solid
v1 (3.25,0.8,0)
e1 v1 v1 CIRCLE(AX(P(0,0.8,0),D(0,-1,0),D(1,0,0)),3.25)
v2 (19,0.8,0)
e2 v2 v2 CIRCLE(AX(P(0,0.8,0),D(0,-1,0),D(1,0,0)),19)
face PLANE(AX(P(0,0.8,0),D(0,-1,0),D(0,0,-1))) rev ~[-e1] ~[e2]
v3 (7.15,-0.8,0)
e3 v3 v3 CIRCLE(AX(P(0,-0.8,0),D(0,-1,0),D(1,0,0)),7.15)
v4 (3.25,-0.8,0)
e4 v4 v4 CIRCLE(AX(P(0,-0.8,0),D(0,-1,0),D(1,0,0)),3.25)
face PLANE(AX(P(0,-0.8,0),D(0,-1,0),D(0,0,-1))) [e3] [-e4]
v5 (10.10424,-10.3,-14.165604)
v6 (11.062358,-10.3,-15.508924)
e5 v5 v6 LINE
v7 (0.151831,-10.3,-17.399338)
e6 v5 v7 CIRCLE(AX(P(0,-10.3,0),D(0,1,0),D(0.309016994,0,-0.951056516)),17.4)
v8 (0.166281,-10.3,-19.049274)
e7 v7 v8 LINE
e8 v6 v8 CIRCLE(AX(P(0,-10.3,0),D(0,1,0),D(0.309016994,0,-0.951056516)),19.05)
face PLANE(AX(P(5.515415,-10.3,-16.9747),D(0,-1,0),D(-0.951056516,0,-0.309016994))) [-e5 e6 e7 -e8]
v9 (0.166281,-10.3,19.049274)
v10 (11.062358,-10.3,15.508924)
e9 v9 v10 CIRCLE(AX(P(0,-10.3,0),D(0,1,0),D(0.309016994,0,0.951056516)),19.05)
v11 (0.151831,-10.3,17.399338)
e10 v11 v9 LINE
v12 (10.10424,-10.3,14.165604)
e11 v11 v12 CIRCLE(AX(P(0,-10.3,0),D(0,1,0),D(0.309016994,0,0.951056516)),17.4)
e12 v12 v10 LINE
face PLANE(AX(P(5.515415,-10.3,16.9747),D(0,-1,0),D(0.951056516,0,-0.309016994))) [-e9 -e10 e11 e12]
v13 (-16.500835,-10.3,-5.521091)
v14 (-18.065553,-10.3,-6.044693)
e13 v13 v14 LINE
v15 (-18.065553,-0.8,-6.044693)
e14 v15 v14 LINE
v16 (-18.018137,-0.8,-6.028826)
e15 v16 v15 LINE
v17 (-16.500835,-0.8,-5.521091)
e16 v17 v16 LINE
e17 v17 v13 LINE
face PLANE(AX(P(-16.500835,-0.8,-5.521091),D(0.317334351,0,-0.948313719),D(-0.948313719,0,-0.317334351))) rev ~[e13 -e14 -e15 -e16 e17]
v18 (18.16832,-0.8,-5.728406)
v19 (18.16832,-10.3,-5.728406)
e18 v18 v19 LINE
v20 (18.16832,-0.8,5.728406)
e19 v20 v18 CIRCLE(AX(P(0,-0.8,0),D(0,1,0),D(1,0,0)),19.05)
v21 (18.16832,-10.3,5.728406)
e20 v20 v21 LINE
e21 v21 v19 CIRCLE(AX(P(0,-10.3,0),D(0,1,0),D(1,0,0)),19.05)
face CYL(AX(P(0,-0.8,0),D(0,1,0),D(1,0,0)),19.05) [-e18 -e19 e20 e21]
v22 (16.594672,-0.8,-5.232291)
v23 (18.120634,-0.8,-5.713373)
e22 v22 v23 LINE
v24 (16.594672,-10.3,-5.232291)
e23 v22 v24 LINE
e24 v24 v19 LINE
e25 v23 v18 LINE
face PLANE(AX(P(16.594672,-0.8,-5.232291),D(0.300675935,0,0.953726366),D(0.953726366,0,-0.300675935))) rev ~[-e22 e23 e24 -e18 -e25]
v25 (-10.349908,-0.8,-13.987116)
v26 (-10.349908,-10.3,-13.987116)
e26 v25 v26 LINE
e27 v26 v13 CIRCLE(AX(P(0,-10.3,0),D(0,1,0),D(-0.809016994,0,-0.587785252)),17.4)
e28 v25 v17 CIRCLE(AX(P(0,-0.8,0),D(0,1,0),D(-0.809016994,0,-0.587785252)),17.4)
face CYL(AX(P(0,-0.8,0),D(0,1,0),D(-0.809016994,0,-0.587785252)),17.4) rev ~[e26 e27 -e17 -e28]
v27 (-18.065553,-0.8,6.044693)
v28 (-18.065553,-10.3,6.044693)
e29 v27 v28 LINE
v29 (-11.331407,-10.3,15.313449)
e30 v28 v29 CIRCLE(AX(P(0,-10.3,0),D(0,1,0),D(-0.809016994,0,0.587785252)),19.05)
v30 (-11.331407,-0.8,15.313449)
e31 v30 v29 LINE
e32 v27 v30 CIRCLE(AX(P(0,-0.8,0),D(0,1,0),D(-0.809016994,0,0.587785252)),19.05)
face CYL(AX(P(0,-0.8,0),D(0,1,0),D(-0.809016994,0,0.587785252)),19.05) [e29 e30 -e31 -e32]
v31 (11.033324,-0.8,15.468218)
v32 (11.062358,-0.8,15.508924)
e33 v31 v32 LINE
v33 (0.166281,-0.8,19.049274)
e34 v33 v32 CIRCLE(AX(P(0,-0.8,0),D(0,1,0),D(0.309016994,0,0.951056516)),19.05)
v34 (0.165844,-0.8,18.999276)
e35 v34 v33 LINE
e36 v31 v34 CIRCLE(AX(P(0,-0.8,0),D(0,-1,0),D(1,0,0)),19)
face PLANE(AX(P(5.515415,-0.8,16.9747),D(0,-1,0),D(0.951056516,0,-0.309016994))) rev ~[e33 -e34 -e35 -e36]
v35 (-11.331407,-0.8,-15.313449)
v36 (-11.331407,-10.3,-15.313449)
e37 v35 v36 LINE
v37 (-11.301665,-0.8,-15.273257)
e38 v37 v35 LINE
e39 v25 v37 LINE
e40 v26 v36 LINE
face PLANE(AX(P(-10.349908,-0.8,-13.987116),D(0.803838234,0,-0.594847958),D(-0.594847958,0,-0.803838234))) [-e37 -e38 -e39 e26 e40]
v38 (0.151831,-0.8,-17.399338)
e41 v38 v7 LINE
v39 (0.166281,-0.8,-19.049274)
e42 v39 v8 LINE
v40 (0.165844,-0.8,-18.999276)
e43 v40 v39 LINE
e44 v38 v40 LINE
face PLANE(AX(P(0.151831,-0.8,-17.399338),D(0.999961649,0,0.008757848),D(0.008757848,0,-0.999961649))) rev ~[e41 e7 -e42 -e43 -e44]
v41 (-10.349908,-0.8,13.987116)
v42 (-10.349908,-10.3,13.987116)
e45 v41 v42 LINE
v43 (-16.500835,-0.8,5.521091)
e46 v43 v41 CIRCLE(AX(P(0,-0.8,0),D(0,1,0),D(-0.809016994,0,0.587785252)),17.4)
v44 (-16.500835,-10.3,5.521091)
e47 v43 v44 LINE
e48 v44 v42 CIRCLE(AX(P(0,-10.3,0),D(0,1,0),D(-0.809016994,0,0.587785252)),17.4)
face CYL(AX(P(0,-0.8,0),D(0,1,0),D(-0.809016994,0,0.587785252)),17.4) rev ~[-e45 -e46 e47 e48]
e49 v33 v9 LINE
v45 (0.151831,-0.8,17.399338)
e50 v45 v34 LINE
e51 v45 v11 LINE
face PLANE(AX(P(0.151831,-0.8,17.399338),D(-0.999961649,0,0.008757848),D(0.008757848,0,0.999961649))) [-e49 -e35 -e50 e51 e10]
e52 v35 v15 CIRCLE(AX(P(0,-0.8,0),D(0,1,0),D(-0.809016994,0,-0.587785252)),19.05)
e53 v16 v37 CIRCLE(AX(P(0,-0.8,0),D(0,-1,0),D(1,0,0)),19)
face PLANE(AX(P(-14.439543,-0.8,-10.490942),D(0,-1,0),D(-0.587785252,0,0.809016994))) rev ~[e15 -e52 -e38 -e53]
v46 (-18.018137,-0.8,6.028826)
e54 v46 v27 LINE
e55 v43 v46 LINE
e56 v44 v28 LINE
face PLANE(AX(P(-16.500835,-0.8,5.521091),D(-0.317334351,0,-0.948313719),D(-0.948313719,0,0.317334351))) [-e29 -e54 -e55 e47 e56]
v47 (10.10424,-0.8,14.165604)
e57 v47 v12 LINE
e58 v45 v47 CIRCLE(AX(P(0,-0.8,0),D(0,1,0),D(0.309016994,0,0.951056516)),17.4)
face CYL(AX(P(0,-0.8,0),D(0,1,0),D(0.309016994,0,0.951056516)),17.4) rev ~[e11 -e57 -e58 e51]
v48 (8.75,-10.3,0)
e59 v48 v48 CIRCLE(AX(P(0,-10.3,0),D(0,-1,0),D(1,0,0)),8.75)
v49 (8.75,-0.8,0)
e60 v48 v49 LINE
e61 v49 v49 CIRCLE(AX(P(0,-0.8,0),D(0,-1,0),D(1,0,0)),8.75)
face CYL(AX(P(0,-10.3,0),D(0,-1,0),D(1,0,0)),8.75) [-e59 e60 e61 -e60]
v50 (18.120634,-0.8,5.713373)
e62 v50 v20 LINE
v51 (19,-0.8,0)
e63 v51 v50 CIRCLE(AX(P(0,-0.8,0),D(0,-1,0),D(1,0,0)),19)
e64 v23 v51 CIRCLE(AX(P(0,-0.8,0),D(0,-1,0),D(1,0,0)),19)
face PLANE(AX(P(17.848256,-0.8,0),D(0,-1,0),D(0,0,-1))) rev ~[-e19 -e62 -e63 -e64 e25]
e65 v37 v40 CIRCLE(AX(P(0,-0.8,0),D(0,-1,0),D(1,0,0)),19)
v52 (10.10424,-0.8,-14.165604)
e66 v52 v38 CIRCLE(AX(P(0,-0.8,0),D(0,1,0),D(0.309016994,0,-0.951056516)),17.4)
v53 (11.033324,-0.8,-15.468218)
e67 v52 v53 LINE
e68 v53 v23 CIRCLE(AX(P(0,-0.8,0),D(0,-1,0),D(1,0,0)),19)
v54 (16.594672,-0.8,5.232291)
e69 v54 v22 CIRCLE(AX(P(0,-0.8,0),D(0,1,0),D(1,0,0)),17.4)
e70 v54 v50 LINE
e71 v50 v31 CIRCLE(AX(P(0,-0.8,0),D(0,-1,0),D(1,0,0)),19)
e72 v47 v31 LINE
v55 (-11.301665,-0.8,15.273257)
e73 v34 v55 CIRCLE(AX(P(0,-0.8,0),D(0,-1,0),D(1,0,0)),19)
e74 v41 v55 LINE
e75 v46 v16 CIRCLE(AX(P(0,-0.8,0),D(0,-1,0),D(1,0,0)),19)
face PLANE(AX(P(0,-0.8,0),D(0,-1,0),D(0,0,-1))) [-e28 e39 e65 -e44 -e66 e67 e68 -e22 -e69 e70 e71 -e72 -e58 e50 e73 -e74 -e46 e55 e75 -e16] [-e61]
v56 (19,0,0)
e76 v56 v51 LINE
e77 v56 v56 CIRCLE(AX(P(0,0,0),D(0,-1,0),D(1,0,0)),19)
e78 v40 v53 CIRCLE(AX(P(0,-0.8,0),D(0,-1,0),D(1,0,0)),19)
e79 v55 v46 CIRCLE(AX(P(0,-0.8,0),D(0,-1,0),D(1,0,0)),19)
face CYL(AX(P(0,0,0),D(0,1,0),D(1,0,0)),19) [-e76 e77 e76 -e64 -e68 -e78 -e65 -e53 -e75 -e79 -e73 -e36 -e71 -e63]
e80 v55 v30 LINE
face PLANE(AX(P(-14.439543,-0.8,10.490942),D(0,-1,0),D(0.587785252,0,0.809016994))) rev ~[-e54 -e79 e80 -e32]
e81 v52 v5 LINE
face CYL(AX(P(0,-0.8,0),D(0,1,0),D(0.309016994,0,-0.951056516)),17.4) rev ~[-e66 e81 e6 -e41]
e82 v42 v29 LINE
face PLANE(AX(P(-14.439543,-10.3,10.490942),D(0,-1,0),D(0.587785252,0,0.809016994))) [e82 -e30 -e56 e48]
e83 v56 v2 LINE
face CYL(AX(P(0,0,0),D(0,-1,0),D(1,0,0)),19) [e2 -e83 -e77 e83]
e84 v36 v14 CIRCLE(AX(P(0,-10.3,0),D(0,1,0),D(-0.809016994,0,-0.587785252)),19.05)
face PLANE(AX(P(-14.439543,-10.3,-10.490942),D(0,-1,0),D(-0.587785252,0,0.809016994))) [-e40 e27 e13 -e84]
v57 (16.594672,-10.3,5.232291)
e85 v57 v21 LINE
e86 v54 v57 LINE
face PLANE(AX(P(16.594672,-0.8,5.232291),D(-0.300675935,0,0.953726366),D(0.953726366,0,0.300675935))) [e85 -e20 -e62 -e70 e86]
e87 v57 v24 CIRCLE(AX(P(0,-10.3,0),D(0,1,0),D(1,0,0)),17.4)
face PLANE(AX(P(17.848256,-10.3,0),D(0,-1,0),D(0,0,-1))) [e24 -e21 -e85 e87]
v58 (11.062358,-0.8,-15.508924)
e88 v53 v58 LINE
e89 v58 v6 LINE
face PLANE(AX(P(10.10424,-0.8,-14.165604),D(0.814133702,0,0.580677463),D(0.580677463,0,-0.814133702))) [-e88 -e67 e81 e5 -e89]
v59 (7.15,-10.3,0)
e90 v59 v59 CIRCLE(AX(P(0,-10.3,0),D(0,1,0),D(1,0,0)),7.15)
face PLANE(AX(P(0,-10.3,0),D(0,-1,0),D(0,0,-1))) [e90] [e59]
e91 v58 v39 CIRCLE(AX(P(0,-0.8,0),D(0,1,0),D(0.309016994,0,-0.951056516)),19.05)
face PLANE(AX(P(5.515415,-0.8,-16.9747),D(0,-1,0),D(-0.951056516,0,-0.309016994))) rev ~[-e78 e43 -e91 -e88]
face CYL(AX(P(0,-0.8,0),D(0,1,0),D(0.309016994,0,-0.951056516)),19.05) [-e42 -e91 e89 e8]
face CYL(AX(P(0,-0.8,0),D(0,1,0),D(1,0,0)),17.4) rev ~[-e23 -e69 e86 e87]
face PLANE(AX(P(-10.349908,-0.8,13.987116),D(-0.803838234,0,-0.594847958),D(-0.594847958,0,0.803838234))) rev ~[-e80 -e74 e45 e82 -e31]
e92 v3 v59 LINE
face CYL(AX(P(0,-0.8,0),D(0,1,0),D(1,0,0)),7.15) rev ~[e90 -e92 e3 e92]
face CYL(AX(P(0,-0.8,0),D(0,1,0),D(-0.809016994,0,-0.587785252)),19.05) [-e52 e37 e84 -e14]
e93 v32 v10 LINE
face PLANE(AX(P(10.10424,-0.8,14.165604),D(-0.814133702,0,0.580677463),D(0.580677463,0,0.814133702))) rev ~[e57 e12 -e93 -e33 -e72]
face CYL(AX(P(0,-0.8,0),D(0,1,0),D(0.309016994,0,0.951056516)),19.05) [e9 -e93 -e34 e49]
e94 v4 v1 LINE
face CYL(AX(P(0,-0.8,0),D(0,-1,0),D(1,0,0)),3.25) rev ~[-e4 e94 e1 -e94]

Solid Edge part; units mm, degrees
sketch "Sketch1" plane through (0, 0, 0) normal (0, -1, 0) x (1, 0, 0)
  circle A0 centre (0, 0) radius 19
  dimension "D1" = 38
extrude "Protrusion1" add sketch "Sketch1" along normal mid plane 1.6
sketch "Sketch2" plane through (0, -0.8, 0) normal (0, -1, 0) x (1, 0, 0)
  line L0 (16.5947, -5.2323) -> (18.1683, -5.7284)
  arc A0 (18.1683, 5.7284) -> (18.1683, -5.7284) centre (0, 0) cw
  line L1 (16.5947, 5.2323) -> (18.1683, 5.7284)
  arc A1 (16.5947, 5.2323) -> (16.5947, -5.2323) centre (0, 0) cw
  dimension "D1" = 1.6
extrude "Protrusion2" add sketch "Sketch2" along normal blind 9.5
pattern_circular "Pattern1" count 5 over 360 about axis through (0, -0.8, 0) along (0, 1, 0) of "Protrusion2"
sketch "Sketch3" plane through (-14.2263, -10.3, -10.4272) normal (0, -1, 0) x (1, 0, 0)
  circle A0 centre (14.2263, 10.4272) radius 8.75
  dimension "D1" = 17.5
extrude "Protrusion7" add sketch "Sketch3" against normal up to next
sketch "Sketch4" plane through (-0.4408, -0.8, 0) normal (0, -1, 0) x (1, 0, 0)
  circle A0 centre (0.4408, 0) radius 7.15
  dimension "D1" = 1.6
extrude "Cutout1" cut sketch "Sketch4" along normal through all
sketch "Sketch5" plane through (0, -0.8, 0) normal (0, -1, 0) x (1, 0, 0)
  circle A0 centre (0, 0) radius 3.25
  dimension "D1" = 6.5
extrude "Cutout2" cut sketch "Sketch5" against normal through all
properties part number "C-101-1" material "STEEL, GALVANIZED"
